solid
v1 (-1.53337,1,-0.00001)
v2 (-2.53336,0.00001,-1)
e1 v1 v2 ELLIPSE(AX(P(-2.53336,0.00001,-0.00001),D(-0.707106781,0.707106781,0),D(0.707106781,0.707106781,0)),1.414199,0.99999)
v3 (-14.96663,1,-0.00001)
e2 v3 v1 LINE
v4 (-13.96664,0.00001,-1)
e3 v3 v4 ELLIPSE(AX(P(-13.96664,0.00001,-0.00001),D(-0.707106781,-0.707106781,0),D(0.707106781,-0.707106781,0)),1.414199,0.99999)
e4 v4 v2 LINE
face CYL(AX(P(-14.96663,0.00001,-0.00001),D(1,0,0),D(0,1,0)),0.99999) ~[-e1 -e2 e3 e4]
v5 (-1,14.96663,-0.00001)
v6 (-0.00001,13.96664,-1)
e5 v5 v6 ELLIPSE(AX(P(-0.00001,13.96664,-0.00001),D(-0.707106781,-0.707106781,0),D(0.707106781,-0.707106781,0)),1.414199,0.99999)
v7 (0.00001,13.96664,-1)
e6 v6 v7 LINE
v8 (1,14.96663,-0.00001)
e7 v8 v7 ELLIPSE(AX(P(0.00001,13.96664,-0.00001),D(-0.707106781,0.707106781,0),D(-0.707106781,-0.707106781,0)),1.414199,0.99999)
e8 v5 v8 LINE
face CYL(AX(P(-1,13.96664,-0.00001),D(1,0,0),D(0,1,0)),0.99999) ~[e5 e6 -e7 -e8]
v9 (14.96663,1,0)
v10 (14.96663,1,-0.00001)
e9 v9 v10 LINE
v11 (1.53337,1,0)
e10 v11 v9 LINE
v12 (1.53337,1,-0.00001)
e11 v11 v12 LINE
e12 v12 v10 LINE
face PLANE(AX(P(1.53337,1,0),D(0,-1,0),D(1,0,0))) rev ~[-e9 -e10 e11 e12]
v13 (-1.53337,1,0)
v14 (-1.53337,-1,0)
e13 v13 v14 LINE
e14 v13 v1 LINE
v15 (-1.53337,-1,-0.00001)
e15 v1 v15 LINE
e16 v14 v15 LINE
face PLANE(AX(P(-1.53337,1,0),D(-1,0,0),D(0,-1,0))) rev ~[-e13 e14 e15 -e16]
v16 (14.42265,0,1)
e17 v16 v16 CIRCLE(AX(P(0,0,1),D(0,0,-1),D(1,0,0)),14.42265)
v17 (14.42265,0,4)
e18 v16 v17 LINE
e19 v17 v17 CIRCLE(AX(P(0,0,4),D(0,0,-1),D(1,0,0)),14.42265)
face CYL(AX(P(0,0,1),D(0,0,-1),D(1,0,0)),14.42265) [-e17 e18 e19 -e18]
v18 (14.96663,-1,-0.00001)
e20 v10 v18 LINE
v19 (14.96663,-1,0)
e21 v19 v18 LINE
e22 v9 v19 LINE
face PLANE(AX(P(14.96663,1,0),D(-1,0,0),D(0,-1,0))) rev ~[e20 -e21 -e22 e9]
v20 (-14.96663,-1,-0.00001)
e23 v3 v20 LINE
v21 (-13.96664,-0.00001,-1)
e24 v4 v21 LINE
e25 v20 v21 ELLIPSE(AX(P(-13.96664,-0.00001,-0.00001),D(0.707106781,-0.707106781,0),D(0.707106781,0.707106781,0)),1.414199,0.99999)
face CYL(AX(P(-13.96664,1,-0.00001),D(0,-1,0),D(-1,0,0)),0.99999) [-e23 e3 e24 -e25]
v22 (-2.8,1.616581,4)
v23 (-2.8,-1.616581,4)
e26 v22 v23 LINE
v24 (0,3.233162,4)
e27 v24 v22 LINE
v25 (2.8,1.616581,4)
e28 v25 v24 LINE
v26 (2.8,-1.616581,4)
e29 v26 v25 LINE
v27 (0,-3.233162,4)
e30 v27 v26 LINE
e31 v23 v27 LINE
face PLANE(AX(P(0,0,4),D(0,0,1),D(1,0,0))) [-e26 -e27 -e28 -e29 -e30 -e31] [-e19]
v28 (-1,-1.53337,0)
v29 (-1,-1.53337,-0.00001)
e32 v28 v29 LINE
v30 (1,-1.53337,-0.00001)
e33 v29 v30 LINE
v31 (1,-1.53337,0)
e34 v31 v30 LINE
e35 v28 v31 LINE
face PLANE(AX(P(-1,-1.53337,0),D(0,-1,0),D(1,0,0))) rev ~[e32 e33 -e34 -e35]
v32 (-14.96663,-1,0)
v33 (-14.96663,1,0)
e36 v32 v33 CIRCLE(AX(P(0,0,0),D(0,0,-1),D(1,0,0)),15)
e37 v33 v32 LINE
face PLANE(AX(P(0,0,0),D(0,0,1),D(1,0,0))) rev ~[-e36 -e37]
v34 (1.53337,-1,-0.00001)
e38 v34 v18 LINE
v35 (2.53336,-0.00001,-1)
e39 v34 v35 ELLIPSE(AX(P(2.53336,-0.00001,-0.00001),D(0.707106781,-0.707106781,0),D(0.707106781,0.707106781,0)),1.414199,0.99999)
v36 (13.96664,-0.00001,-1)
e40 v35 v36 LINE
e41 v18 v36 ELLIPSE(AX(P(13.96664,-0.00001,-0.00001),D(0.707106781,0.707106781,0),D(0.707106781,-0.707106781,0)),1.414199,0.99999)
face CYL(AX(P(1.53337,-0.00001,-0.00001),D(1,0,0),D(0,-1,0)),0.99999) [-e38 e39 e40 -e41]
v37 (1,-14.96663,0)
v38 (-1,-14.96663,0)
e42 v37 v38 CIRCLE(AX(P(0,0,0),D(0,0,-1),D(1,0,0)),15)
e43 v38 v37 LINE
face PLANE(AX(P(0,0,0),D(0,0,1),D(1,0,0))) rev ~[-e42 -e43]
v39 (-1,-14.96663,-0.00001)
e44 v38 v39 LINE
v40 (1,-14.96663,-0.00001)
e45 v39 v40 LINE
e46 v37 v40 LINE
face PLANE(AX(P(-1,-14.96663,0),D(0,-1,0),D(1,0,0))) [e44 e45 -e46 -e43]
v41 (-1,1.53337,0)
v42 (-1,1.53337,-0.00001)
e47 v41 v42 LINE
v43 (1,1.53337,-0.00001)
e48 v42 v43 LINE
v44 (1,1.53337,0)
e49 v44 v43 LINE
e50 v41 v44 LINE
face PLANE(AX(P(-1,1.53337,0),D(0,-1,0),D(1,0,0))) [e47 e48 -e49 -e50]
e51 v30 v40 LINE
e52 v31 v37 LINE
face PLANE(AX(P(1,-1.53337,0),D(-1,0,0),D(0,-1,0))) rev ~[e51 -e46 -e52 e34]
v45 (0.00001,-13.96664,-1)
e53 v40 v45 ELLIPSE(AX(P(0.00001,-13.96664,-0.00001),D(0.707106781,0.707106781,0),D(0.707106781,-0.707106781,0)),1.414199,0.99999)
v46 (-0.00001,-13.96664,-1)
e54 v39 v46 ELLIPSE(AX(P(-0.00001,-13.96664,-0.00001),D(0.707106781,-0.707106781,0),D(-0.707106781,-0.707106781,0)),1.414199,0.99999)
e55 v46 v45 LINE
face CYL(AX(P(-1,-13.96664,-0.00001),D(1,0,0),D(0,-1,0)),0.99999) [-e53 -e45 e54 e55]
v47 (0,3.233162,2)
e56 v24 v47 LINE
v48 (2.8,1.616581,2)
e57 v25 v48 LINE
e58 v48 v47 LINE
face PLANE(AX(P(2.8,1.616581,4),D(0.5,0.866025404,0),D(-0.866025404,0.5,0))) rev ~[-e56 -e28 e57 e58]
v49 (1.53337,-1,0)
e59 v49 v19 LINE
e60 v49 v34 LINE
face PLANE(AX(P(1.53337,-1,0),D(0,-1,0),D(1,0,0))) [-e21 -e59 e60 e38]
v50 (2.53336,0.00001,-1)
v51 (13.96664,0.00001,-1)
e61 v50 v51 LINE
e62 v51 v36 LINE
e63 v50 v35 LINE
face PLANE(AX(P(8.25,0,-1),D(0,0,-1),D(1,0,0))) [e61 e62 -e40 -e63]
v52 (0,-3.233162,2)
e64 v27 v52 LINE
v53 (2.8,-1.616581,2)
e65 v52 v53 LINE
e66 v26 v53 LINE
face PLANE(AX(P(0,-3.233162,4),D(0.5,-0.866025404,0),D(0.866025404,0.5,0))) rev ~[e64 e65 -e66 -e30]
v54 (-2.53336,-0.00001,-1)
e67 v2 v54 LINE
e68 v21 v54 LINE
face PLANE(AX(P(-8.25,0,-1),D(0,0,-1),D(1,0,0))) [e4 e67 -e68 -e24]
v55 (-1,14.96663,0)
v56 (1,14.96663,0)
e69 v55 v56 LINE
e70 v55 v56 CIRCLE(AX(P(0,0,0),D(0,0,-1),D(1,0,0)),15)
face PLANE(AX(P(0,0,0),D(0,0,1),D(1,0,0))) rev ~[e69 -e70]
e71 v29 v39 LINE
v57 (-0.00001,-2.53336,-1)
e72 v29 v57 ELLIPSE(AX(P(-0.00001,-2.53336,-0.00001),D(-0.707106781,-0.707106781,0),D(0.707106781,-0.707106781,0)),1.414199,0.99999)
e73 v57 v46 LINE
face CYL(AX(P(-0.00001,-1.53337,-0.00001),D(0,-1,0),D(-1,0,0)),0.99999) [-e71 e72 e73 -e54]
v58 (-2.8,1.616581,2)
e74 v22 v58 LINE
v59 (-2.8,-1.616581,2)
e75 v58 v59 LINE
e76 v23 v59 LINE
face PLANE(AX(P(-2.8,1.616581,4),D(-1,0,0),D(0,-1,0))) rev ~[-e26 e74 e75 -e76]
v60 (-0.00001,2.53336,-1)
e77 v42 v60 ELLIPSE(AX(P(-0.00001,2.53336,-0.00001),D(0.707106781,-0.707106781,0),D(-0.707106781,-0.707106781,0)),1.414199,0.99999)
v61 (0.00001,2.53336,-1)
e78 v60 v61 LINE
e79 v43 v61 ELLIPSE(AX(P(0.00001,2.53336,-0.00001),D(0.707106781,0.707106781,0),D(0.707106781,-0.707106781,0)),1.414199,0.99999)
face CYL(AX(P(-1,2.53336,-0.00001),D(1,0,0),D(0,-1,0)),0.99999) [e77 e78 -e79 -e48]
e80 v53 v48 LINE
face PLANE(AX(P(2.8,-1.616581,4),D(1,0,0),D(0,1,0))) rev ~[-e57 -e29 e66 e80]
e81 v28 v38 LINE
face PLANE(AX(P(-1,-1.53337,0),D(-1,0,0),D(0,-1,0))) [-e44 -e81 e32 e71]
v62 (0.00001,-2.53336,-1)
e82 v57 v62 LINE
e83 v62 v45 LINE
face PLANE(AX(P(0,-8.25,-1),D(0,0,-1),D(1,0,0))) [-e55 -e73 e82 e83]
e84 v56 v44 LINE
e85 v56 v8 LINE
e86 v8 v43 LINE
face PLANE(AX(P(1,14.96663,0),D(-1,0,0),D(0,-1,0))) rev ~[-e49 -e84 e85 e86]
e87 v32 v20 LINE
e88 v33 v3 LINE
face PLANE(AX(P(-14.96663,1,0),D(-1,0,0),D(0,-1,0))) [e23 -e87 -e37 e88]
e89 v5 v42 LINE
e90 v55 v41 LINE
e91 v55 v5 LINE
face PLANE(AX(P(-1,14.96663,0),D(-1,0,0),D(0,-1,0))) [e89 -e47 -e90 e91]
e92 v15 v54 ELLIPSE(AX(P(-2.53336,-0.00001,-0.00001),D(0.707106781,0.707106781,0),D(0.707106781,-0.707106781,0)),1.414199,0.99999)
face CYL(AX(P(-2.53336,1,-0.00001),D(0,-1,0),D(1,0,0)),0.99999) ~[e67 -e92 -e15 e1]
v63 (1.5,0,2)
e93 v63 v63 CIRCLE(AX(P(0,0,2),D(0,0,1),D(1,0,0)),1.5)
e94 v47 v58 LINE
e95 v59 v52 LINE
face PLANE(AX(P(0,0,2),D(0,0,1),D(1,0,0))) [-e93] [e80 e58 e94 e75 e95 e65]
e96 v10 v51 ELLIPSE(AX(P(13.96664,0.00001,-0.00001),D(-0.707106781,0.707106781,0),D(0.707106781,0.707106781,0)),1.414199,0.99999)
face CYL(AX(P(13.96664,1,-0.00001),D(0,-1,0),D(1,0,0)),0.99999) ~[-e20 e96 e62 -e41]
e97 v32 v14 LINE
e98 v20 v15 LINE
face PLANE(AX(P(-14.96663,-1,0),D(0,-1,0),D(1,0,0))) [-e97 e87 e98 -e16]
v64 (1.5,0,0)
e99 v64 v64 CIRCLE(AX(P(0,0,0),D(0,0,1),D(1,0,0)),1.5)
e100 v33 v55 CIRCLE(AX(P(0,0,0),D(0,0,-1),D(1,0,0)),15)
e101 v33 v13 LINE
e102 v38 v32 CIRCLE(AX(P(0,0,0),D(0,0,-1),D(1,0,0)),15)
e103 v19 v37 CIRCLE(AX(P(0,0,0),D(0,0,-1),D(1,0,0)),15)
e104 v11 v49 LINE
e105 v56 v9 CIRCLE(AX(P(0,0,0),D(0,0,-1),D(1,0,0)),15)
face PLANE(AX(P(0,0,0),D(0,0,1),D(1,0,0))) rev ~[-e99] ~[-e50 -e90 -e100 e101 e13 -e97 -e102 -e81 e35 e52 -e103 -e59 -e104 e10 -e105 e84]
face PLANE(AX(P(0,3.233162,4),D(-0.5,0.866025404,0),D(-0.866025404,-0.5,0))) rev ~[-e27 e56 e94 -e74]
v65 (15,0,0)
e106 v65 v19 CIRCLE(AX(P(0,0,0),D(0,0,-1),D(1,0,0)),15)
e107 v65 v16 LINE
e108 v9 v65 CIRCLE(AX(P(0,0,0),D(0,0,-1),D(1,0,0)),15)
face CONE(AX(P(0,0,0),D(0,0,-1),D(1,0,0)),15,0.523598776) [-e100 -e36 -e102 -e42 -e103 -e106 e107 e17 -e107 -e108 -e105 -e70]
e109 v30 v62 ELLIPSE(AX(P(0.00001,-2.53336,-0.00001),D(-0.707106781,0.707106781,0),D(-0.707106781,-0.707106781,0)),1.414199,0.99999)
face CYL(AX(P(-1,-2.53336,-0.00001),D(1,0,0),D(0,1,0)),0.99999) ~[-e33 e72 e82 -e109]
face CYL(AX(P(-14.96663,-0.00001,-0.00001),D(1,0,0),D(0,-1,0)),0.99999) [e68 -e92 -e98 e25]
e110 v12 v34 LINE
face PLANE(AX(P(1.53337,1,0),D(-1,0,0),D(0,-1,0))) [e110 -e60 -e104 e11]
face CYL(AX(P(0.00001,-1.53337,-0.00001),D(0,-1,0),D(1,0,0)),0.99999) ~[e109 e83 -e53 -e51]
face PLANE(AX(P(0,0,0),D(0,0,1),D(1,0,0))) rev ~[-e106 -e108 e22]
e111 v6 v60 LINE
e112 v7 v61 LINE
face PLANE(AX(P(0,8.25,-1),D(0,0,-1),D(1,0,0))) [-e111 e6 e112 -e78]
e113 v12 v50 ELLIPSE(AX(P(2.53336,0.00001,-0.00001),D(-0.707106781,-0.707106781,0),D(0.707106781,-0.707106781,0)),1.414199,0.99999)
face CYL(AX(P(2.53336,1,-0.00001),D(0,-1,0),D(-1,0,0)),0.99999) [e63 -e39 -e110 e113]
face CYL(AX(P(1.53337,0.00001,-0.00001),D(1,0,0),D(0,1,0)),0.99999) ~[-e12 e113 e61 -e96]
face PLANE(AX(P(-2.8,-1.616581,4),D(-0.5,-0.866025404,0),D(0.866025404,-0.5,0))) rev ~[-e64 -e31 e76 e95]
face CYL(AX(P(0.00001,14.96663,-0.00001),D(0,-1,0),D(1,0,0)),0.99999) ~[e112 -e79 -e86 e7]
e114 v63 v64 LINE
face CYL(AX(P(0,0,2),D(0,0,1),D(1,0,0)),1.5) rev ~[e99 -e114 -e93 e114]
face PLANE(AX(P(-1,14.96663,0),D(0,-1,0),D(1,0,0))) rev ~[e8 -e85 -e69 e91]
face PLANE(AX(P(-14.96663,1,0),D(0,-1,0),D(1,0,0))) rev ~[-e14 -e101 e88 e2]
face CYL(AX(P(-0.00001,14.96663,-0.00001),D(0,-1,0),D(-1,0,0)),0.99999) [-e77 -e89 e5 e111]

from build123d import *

# Parameters (mm, degrees)
F0_R     = 15
F1_DEPTH = 1
F1_TAPER = 30
F2_DEPTH = 3
F4_DEPTH = 2
F5_R     = 1.5
F6_DEPTH = 2.001
F7_W     = 13.4332590942
F7_H     = 2
F7_W_2   = 2
F7_H_2   = 13.4332590942
F8_DEPTH = 1
F9_R     = 0.99999


# Not quite as in the source:
# - a fillet or chamfer is up to 0.001 mm smaller than in the source, because OpenCascade refuses the exact size


with BuildPart() as f1:
    # F0 (on Top) → F1 (new body)
    with BuildSketch(Plane.XY):
        Circle(F0_R)
    extrude(amount=F1_DEPTH, taper=F1_TAPER)

    # F2 (add): a face of the model
    f2_faces = [f1.faces().sort_by_distance(p)[0] for p in [
        (0, 0, 1),
    ]]
    extrude(f2_faces, amount=F2_DEPTH)

    # F3 (on face) → F4 (cut)
    with BuildSketch(Plane.XY.offset(4)):
        Polygon((2.8, -1.6165807537), (2.8, 1.6165807537), (0, 3.2331615075), (-2.8, 1.6165807537), (-2.8, -1.6165807537), (0, -3.2331615075), align=None)
    extrude(amount=-F4_DEPTH, mode=Mode.SUBTRACT)

    # F5 (on face) → F6 (cut, through all)
    with BuildSketch(Plane.XY.offset(2)):
        Circle(F5_R)
    extrude(amount=-F6_DEPTH, mode=Mode.SUBTRACT)

    # F7 (on face) → F8 (join)
    with BuildSketch(Plane(origin=(0, 0, 0), x_dir=(1, 0, 0), z_dir=(0, 0, -1))):
        with Locations((-8.25, 0)):
            Rectangle(F7_W, F7_H)
        with Locations((0, 8.25)):
            Rectangle(F7_W_2, F7_H_2)
        with Locations((8.25, 0)):
            Rectangle(F7_W, F7_H)
        with Locations((0, -8.25)):
            Rectangle(F7_W_2, F7_H_2)
    extrude(amount=F8_DEPTH)

    # F9 (radius 1 in the source; OpenCascade refuses exactly that, so slightly less here)
    f9_edges = [f1.edges().sort_by_distance(p)[0] for p in [
        (-1, 8.25, -1),
        (1, 8.25, -1),
        (8.25, 1, -1),
        (14.96663, 0, -1),
        (8.25, -1, -1),
        (1.53337, 0, -1),
        (-8.25, 1, -1),
        (-8.25, -1, -1),
        (1, -8.25, -1),
        (-1, -8.25, -1),
        (0, 14.96663, -1),
        (0, 1.53337, -1),
        (0, -1.53337, -1),
        (-1.53337, 0, -1),
        (-14.96663, 0, -1),
        (0, -14.96663, -1),
    ]]
    fillet(f9_edges, radius=F9_R)


solid = f1.part
